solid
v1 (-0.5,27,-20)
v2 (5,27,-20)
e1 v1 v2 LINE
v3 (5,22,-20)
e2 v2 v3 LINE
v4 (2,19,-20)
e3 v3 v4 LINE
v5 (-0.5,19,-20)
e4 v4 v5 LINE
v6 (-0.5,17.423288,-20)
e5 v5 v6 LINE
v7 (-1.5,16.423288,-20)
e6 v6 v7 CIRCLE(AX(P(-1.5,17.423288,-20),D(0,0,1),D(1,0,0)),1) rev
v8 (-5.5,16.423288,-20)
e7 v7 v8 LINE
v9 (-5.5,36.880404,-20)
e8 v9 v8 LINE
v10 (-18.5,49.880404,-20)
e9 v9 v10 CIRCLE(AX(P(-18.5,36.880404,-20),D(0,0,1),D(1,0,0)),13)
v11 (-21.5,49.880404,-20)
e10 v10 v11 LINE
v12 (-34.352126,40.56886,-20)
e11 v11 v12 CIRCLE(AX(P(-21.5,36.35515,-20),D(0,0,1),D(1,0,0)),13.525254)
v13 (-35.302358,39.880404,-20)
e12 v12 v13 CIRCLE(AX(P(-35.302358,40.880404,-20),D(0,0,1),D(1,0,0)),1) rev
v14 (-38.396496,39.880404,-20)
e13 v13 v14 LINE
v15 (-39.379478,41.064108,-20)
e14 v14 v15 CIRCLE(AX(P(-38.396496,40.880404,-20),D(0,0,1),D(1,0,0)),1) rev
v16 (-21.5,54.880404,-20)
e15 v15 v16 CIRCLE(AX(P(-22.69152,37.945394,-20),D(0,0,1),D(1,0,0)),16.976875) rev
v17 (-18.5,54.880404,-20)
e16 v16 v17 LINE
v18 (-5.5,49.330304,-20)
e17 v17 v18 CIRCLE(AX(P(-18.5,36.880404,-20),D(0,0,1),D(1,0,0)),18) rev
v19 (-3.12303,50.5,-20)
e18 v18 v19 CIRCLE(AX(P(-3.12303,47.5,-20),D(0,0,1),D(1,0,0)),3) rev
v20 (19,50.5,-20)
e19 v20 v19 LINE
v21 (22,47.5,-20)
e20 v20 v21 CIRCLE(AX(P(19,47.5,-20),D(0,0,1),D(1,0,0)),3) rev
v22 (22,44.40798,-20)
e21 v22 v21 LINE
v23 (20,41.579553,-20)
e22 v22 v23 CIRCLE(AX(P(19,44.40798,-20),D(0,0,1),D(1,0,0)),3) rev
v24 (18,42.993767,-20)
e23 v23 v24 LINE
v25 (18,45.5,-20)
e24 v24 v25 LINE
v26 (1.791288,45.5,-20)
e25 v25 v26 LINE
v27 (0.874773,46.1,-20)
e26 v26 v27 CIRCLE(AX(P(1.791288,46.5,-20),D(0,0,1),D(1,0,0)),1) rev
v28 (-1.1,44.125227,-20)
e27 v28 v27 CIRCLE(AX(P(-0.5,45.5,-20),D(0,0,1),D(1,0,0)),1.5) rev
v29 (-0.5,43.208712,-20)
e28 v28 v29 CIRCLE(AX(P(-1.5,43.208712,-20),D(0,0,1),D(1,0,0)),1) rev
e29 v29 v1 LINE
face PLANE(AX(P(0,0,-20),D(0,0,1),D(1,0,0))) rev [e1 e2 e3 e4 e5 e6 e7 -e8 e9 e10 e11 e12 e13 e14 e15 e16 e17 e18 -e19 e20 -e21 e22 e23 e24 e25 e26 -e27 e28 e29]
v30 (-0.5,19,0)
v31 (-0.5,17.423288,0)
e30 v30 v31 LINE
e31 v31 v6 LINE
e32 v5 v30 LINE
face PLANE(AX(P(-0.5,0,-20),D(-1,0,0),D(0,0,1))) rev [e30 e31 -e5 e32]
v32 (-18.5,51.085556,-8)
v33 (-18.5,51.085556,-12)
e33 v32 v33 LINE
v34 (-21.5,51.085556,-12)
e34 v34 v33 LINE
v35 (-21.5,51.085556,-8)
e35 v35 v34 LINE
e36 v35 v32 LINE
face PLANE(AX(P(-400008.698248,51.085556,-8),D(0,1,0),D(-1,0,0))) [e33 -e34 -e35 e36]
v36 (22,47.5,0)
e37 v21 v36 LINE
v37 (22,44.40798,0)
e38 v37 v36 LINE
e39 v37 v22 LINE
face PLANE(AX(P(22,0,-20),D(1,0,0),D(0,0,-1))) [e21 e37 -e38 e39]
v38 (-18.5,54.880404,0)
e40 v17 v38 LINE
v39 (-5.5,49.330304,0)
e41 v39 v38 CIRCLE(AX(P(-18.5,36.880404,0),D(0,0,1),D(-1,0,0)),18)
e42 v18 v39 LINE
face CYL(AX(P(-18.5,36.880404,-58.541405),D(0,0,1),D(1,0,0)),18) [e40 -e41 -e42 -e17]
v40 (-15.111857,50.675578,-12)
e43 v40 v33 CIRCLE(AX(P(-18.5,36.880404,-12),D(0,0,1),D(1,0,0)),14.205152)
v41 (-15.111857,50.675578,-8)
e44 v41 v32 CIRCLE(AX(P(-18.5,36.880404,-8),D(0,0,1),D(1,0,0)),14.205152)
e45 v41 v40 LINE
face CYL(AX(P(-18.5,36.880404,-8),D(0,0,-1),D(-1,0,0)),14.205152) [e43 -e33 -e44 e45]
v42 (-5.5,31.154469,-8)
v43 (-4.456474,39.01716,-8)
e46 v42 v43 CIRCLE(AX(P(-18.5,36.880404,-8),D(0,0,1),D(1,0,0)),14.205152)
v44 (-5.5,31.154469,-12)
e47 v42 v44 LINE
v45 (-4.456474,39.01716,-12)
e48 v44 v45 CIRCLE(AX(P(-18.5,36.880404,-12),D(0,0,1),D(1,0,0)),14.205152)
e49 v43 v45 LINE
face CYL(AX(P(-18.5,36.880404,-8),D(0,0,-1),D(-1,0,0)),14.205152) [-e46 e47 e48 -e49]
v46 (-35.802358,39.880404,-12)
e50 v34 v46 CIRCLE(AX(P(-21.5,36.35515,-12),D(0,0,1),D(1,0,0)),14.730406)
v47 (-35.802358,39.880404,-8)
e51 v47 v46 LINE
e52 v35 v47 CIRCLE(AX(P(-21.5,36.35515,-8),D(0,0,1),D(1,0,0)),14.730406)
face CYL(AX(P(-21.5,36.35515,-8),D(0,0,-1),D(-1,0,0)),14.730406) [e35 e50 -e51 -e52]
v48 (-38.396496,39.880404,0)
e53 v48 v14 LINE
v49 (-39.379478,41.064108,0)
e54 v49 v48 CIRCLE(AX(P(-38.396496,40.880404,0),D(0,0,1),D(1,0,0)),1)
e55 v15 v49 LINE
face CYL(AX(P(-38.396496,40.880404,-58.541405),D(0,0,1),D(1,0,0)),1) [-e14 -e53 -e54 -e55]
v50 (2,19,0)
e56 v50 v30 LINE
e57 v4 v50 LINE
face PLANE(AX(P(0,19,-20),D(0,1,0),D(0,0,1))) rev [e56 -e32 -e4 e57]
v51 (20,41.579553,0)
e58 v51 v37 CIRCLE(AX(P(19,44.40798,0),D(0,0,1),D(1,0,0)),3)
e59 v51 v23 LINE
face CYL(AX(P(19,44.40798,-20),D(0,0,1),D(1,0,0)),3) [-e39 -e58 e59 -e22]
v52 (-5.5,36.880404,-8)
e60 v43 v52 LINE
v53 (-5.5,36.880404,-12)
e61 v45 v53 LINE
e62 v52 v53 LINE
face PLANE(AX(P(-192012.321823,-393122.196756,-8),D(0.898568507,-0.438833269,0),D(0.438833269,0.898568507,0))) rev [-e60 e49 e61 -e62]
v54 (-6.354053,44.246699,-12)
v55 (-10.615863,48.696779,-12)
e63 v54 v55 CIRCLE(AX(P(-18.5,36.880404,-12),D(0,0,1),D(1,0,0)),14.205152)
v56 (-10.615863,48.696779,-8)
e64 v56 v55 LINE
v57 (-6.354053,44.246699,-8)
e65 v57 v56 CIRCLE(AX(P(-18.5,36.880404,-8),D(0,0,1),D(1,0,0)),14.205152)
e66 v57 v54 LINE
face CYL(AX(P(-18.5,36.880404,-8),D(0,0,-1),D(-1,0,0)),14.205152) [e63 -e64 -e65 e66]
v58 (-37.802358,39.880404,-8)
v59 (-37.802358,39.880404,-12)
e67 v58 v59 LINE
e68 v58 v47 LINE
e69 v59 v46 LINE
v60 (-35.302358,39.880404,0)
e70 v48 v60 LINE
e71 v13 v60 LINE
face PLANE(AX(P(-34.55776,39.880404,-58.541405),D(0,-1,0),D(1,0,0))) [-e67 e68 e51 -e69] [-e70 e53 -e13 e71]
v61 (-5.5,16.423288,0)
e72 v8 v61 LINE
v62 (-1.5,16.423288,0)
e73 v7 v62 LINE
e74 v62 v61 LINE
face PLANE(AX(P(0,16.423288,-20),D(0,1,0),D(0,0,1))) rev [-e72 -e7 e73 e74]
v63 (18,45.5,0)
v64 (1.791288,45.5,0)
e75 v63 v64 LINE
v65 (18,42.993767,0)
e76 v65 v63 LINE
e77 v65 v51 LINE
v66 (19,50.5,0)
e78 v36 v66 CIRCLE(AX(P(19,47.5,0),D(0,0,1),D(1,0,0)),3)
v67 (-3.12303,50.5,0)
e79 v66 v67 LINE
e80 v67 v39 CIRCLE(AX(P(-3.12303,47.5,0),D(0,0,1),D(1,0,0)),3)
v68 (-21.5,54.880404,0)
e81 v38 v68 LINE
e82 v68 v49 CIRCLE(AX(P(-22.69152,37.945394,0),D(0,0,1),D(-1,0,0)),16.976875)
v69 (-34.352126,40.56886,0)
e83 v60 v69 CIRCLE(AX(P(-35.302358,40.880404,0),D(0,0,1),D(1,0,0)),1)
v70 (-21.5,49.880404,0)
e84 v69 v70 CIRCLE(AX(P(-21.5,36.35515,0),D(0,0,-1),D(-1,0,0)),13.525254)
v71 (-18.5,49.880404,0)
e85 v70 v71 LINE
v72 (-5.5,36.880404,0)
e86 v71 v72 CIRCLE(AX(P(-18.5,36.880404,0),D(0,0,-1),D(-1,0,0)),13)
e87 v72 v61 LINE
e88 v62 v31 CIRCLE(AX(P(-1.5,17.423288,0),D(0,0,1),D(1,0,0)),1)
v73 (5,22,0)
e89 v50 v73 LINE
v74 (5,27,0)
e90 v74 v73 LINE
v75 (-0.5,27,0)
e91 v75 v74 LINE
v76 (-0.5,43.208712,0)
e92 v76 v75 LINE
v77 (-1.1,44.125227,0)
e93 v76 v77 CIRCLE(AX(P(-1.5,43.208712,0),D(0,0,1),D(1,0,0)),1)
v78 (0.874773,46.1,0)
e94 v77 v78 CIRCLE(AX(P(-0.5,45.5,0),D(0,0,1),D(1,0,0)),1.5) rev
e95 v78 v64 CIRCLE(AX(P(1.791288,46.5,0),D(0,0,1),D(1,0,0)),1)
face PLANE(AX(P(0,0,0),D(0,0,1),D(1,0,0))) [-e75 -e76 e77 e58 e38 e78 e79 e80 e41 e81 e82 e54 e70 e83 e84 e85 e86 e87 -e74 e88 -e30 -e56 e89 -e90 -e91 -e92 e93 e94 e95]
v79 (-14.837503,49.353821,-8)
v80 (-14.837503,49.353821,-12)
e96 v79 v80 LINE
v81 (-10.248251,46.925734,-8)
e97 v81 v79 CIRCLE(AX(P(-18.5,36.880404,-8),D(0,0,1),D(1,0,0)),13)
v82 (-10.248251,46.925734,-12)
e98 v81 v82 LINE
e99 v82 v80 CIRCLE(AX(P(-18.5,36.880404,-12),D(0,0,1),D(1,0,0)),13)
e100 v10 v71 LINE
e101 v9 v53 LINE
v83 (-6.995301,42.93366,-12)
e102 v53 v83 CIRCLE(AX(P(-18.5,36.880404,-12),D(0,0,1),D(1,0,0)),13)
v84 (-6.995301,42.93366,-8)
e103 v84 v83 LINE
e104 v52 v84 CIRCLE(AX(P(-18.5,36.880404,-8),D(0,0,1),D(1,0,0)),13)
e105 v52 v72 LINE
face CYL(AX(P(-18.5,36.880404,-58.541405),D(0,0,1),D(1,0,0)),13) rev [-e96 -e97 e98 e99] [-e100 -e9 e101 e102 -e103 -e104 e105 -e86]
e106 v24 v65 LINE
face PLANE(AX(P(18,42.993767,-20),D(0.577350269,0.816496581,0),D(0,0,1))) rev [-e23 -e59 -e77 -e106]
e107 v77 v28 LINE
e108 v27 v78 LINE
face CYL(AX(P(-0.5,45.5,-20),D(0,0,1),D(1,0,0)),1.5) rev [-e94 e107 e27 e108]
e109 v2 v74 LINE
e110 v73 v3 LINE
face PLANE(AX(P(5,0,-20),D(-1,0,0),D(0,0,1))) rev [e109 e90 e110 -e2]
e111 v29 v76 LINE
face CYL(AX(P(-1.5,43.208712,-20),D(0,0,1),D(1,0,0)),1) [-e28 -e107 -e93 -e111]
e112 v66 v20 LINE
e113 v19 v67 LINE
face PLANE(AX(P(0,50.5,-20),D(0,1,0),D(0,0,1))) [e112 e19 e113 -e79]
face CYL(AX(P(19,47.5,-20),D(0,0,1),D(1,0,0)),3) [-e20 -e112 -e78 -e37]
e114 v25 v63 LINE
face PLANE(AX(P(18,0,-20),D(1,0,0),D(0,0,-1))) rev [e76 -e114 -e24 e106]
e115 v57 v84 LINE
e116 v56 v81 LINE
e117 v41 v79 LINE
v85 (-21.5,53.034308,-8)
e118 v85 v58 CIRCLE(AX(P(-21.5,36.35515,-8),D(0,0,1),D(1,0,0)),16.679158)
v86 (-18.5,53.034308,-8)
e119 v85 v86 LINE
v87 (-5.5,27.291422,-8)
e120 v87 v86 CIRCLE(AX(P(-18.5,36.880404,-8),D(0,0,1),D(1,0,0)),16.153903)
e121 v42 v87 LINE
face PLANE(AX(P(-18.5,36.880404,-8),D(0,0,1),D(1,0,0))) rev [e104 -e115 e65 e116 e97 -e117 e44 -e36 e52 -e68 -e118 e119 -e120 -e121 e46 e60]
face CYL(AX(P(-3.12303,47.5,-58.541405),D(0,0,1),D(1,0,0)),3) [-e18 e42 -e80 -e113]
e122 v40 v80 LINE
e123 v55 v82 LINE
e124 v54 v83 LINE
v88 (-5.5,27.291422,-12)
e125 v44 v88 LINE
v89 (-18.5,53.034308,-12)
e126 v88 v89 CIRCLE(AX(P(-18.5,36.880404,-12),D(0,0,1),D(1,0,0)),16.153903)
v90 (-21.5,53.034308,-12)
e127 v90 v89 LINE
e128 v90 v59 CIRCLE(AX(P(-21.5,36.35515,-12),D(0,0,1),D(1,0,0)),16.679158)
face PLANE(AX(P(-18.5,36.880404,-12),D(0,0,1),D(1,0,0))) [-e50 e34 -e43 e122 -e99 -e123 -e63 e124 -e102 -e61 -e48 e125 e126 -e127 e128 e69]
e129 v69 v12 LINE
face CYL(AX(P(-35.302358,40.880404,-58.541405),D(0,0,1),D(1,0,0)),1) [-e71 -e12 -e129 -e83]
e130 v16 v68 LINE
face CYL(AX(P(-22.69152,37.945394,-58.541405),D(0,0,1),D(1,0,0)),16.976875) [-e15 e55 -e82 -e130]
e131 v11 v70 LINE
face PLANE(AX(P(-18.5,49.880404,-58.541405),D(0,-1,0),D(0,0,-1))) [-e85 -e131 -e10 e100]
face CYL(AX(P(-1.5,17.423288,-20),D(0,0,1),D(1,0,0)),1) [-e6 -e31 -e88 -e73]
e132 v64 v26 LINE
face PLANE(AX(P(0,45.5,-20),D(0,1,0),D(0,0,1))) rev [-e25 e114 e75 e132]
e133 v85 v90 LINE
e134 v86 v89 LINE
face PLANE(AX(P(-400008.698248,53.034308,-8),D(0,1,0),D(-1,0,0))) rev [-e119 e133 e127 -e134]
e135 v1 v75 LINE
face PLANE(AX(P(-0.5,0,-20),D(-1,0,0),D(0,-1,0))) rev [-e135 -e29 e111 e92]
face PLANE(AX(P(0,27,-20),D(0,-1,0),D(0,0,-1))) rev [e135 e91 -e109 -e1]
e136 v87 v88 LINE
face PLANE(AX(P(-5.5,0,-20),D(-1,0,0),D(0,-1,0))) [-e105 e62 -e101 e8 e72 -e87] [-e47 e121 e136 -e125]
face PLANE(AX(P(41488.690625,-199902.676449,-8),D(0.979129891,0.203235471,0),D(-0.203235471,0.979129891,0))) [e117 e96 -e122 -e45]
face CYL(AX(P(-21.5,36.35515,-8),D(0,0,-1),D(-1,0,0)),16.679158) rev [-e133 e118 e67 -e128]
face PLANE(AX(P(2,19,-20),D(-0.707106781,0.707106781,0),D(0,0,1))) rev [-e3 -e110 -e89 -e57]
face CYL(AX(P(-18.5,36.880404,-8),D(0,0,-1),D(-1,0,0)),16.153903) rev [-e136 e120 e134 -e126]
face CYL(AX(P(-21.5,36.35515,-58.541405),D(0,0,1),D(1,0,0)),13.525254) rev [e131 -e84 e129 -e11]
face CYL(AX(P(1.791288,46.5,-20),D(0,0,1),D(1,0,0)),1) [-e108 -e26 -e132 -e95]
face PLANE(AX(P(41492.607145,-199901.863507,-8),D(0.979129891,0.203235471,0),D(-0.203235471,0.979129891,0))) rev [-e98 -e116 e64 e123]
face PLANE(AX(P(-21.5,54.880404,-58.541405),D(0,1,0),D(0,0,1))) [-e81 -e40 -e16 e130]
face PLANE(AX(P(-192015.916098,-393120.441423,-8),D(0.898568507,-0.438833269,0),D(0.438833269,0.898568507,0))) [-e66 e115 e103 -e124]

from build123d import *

# Parameters (mm, degrees)
BOSS_EXTRUDE1_DEPTH     = 20
BOSS_EXTRUDE2_DEPTH     = 20
FILLET1_R               = 3
CHAMFER1_SIZE           = 3
FILLET2_R               = 1
CUT_EXTRUDE1_DEPTH      = 71.578127074
CUT_EXTRUDE2_DEPTH      = 2
CUT_EXTRUDE2_DEPTH_BACK = 2
CUT_EXTRUDE2_START      = -10
CHAMFER2_START          = 44.201779004
CHAMFER2_OUTLINE_W      = 6
CHAMFER2_OUTLINE_H      = 20
CHAMFER2_DEPTH          = 1.294789205


with BuildPart() as part:
    # Sketch1 → Boss-Extrude1 (new body)
    with BuildSketch(Plane.XY):
        with BuildLine():
            Line((18, 45.5), (18, 41.407980081))
            Line((18, 41.407980081), (22, 41.407980081))
            Line((22, 41.407980081), (22, 50.5))
            Line((22, 50.5), (-5.5, 50.5))
            Line((-5.5, 50.5), (-5.5, 28.873187411))
            Line((-5.5, 28.873187411), (-5.5, 16.423287813))
            Line((-5.5, 16.423287813), (-0.5, 16.423287813))
            Line((-0.5, 16.423287813), (-0.5, 19))
            Line((-0.5, 19), (5, 19))
            Line((5, 19), (5, 27))
            Line((5, 27), (-0.5, 27))
            Line((-0.5, 27), (-0.5, 44))
            ThreePointArc((-0.5, 44), (-1.560660172, 46.560660172), (1, 45.5))
            Line((1, 45.5), (18, 45.5))
        make_face()
        with BuildLine():
            Line((-5.5, 16.423287813), (-5.5, 28.873187411))
            ThreePointArc((-5.5, 28.873187411), (-9.307611845, 19.680799255), (-18.5, 15.873187411))
            Line((-18.5, 15.873187411), (-21.5, 15.873187411))
            ThreePointArc((-21.5, 15.873187411), (-29.723519433, 18.660367749), (-34.557759664, 25.873187411))
            Line((-34.557759664, 25.873187411), (-39.557759664, 25.873187411))
            ThreePointArc((-39.557759664, 25.873187411), (-33.539294452, 14.749097831), (-21.5, 10.873187411))
            Line((-21.5, 10.873187411), (-18.5, 10.873187411))
            ThreePointArc((-18.5, 10.873187411), (-11.432404679, 12.31875911), (-5.5, 16.423287813))
        make_face()
    extrude(amount=-BOSS_EXTRUDE1_DEPTH)

    # Sketch4 → Boss-Extrude2 (add)
    with BuildSketch(Plane.XY):
        with BuildLine():
            Line((-5.5, 49.330303976), (-5.5, 36.880404378))
            ThreePointArc((-5.5, 36.880404378), (-9.307611845, 46.072792533), (-18.5, 49.880404378))
            Line((-18.5, 49.880404378), (-21.5, 49.880404378))
            ThreePointArc((-21.5, 49.880404378), (-29.723519433, 47.09322404), (-34.557759664, 39.880404378))
            Line((-34.557759664, 39.880404378), (-39.557759664, 39.880404378))
            ThreePointArc((-39.557759664, 39.880404378), (-33.539294452, 51.004493958), (-21.5, 54.880404378))
            Line((-21.5, 54.880404378), (-18.5, 54.880404378))
            ThreePointArc((-18.5, 54.880404378), (-11.432404679, 53.434832679), (-5.5, 49.330303976))
        make_face()
    extrude(amount=-BOSS_EXTRUDE2_DEPTH)

    # Fillet1
    # the kernel refuses this fillet: 3 mm, written as the material it takes off along each edge
    with BuildSketch(Plane(origin=(22, 41.407980081, 7.5), x_dir=(-1, 0, 0), z_dir=(0, 0, -1)), Plane(origin=(22, 50.5, 7.5), x_dir=(0, -1, 0), z_dir=(0, 0, -1))) as fillet1_piece_1:
        with BuildLine():
            CenterArc((FILLET1_R, FILLET1_R), FILLET1_R, 180, 90)
            Line((0, FILLET1_R), (-FILLET1_R * 0.02, FILLET1_R))
            Line((-FILLET1_R * 0.02, FILLET1_R), (-FILLET1_R * 0.02, -FILLET1_R * 0.02))
            Line((-FILLET1_R * 0.02, -FILLET1_R * 0.02), (FILLET1_R, -FILLET1_R * 0.02))
            Line((FILLET1_R, -FILLET1_R * 0.02), (FILLET1_R, 0))
        make_face()
    extrude(amount=35, mode=Mode.SUBTRACT)
    with BuildSketch(Plane(origin=(-5.5, 50.5, 5.942425513), x_dir=(1, 0, 0), z_dir=(0, 0, -1))) as fillet1_piece_2_section:
        with BuildLine():
            CenterArc((2.376970205, 3), FILLET1_R, 217.596829801, 52.403170199)
            Line((0, 1.169696024), (-0.047539404, 1.133089945))
            ThreePointArc((-0.047539404, 1.133089945), (-0.06, 0.584848012), (-0.06, 0))
            Line((-0.06, 0), (0, -0.06))
            Line((0, -0.06), (2.376970205, -0.06))
            Line((2.376970205, -0.06), (2.376970205, 0))
        make_face()
    fillet1_piece_2 = extrude(amount=31.884851026, mode=Mode.PRIVATE)
    fillet1_piece_2 = fillet1_piece_2 - Plane(origin=(-18.5, 36.880404378, 5.942425513), x_dir=(0, 1, 0), z_dir=(0, 0, 1)) * Cylinder(18, 74, mode=Mode.PRIVATE)
    add(fillet1_piece_2, mode=Mode.SUBTRACT)

    # Chamfer1
    chamfer1_edges = [part.edges().sort_by_distance(p)[0] for p in [
        (5, 19, -10),
    ]]
    chamfer(chamfer1_edges, length=CHAMFER1_SIZE)

    # Fillet2
    fillet2_edges = [part.edges().sort_by_distance(p)[0] for p in [
        (-0.5, 16.423287813, -10),
        (1, 45.5, -10),
        (-0.5, 44, -10),
        (-34.557759664, 39.880404378, -10),
        (-39.557759664, 39.880404378, -10),
    ]]
    fillet(fillet2_edges, radius=FILLET2_R)

    # Sketch1<3> → Cut-Extrude1 (cut, through all)
    with BuildSketch(Plane.XY):
        with BuildLine():
            Line((-34.557759664, 25.873187411), (-39.557759664, 25.873187411))
            ThreePointArc((-39.557759664, 25.873187411), (-33.539294452, 14.749097831), (-21.5, 10.873187411))
            Line((-21.5, 10.873187411), (-18.5, 10.873187411))
            ThreePointArc((-18.5, 10.873187411), (-11.432404679, 12.31875911), (-5.5, 16.423287813))
            Line((-5.5, 16.423287813), (-5.5, 28.873187411))
            ThreePointArc((-5.5, 28.873187411), (-9.307611845, 19.680799255), (-18.5, 15.873187411))
            Line((-18.5, 15.873187411), (-21.5, 15.873187411))
            ThreePointArc((-21.5, 15.873187411), (-29.723519433, 18.660367749), (-34.557759664, 25.873187411))
        make_face()
    extrude(amount=-CUT_EXTRUDE1_DEPTH, mode=Mode.SUBTRACT)

    # Sketch3 → Cut-Extrude2 (cut, two sides: drawn at the far end of the back side and taken through both)
    with BuildSketch(Plane.XY.offset(CUT_EXTRUDE2_START - CUT_EXTRUDE2_DEPTH_BACK)):
        with BuildLine():
            ThreePointArc((-10.615862632, 48.696779185), (-12.77767622, 49.881994518), (-15.111856664, 50.675578184))
            Line((-15.111856664, 50.675578184), (-14.837502866, 49.3538207))
            ThreePointArc((-14.837502866, 49.3538207), (-12.420426421, 48.371217451), (-10.248251304, 46.925733813))
            Line((-10.248251304, 46.925733813), (-10.615862632, 48.696779185))
        make_face()
        with BuildLine():
            ThreePointArc((-4.45647435, 39.017159612), (-5.14675526, 41.725731045), (-6.354052632, 44.246699113))
            Line((-6.354052632, 44.246699113), (-6.995300859, 42.933659509))
            ThreePointArc((-6.995300859, 42.933659509), (-5.87936038, 39.99800852), (-5.5, 36.880404378))
            Line((-5.5, 36.880404378), (-4.45647435, 39.017159612))
        make_face()
        with BuildLine():
            ThreePointArc((-21.5, 53.034307539), (-31.973681851, 49.335761876), (-37.80235804, 39.880404378))
            Line((-37.80235804, 39.880404378), (-35.80235804, 39.880404378))
            ThreePointArc((-35.80235804, 39.880404378), (-30.584504262, 47.950694244), (-21.5, 51.085556106))
            Line((-21.5, 51.085556106), (-18.5, 51.085556106))
            ThreePointArc((-18.5, 51.085556106), (-16.793571188, 50.982689168), (-15.111856664, 50.675578184))
            ThreePointArc((-15.111856664, 50.675578184), (-12.77767622, 49.881994518), (-10.615862632, 48.696779185))
            ThreePointArc((-10.615862632, 48.696779185), (-8.240766267, 46.705599481), (-6.354052632, 44.246699113))
            ThreePointArc((-6.354052632, 44.246699113), (-5.14675526, 41.725731045), (-4.45647435, 39.017159612))
            ThreePointArc((-4.45647435, 39.017159612), (-4.418325892, 35.011503653), (-5.5, 31.15446903))
            Line((-5.5, 31.15446903), (-5.5, 28.873187411))
            Line((-5.5, 28.873187411), (-5.5, 27.291421776))
            ThreePointArc((-5.5, 27.291421776), (-4.080428513, 44.162199863), (-18.5, 53.034307539))
            Line((-18.5, 53.034307539), (-21.5, 53.034307539))
        make_face()
    extrude(amount=CUT_EXTRUDE2_DEPTH + CUT_EXTRUDE2_DEPTH_BACK, mode=Mode.SUBTRACT)

    # Chamfer2: read off the stored shape, not the designer's step
    # Chamfer2 outline → Chamfer2 (cut)
    with BuildSketch(Plane(origin=(0, 0, 0), x_dir=(0.8164965809277286, -0.5773502691896223, 0), z_dir=(0.5773502691896223, 0.8164965809277285, 0)).offset(CHAMFER2_START)):
        with Locations((-9, 10)):
            Rectangle(CHAMFER2_OUTLINE_W, CHAMFER2_OUTLINE_H)
    extrude(amount=CHAMFER2_DEPTH, mode=Mode.SUBTRACT)


solid = part.part
